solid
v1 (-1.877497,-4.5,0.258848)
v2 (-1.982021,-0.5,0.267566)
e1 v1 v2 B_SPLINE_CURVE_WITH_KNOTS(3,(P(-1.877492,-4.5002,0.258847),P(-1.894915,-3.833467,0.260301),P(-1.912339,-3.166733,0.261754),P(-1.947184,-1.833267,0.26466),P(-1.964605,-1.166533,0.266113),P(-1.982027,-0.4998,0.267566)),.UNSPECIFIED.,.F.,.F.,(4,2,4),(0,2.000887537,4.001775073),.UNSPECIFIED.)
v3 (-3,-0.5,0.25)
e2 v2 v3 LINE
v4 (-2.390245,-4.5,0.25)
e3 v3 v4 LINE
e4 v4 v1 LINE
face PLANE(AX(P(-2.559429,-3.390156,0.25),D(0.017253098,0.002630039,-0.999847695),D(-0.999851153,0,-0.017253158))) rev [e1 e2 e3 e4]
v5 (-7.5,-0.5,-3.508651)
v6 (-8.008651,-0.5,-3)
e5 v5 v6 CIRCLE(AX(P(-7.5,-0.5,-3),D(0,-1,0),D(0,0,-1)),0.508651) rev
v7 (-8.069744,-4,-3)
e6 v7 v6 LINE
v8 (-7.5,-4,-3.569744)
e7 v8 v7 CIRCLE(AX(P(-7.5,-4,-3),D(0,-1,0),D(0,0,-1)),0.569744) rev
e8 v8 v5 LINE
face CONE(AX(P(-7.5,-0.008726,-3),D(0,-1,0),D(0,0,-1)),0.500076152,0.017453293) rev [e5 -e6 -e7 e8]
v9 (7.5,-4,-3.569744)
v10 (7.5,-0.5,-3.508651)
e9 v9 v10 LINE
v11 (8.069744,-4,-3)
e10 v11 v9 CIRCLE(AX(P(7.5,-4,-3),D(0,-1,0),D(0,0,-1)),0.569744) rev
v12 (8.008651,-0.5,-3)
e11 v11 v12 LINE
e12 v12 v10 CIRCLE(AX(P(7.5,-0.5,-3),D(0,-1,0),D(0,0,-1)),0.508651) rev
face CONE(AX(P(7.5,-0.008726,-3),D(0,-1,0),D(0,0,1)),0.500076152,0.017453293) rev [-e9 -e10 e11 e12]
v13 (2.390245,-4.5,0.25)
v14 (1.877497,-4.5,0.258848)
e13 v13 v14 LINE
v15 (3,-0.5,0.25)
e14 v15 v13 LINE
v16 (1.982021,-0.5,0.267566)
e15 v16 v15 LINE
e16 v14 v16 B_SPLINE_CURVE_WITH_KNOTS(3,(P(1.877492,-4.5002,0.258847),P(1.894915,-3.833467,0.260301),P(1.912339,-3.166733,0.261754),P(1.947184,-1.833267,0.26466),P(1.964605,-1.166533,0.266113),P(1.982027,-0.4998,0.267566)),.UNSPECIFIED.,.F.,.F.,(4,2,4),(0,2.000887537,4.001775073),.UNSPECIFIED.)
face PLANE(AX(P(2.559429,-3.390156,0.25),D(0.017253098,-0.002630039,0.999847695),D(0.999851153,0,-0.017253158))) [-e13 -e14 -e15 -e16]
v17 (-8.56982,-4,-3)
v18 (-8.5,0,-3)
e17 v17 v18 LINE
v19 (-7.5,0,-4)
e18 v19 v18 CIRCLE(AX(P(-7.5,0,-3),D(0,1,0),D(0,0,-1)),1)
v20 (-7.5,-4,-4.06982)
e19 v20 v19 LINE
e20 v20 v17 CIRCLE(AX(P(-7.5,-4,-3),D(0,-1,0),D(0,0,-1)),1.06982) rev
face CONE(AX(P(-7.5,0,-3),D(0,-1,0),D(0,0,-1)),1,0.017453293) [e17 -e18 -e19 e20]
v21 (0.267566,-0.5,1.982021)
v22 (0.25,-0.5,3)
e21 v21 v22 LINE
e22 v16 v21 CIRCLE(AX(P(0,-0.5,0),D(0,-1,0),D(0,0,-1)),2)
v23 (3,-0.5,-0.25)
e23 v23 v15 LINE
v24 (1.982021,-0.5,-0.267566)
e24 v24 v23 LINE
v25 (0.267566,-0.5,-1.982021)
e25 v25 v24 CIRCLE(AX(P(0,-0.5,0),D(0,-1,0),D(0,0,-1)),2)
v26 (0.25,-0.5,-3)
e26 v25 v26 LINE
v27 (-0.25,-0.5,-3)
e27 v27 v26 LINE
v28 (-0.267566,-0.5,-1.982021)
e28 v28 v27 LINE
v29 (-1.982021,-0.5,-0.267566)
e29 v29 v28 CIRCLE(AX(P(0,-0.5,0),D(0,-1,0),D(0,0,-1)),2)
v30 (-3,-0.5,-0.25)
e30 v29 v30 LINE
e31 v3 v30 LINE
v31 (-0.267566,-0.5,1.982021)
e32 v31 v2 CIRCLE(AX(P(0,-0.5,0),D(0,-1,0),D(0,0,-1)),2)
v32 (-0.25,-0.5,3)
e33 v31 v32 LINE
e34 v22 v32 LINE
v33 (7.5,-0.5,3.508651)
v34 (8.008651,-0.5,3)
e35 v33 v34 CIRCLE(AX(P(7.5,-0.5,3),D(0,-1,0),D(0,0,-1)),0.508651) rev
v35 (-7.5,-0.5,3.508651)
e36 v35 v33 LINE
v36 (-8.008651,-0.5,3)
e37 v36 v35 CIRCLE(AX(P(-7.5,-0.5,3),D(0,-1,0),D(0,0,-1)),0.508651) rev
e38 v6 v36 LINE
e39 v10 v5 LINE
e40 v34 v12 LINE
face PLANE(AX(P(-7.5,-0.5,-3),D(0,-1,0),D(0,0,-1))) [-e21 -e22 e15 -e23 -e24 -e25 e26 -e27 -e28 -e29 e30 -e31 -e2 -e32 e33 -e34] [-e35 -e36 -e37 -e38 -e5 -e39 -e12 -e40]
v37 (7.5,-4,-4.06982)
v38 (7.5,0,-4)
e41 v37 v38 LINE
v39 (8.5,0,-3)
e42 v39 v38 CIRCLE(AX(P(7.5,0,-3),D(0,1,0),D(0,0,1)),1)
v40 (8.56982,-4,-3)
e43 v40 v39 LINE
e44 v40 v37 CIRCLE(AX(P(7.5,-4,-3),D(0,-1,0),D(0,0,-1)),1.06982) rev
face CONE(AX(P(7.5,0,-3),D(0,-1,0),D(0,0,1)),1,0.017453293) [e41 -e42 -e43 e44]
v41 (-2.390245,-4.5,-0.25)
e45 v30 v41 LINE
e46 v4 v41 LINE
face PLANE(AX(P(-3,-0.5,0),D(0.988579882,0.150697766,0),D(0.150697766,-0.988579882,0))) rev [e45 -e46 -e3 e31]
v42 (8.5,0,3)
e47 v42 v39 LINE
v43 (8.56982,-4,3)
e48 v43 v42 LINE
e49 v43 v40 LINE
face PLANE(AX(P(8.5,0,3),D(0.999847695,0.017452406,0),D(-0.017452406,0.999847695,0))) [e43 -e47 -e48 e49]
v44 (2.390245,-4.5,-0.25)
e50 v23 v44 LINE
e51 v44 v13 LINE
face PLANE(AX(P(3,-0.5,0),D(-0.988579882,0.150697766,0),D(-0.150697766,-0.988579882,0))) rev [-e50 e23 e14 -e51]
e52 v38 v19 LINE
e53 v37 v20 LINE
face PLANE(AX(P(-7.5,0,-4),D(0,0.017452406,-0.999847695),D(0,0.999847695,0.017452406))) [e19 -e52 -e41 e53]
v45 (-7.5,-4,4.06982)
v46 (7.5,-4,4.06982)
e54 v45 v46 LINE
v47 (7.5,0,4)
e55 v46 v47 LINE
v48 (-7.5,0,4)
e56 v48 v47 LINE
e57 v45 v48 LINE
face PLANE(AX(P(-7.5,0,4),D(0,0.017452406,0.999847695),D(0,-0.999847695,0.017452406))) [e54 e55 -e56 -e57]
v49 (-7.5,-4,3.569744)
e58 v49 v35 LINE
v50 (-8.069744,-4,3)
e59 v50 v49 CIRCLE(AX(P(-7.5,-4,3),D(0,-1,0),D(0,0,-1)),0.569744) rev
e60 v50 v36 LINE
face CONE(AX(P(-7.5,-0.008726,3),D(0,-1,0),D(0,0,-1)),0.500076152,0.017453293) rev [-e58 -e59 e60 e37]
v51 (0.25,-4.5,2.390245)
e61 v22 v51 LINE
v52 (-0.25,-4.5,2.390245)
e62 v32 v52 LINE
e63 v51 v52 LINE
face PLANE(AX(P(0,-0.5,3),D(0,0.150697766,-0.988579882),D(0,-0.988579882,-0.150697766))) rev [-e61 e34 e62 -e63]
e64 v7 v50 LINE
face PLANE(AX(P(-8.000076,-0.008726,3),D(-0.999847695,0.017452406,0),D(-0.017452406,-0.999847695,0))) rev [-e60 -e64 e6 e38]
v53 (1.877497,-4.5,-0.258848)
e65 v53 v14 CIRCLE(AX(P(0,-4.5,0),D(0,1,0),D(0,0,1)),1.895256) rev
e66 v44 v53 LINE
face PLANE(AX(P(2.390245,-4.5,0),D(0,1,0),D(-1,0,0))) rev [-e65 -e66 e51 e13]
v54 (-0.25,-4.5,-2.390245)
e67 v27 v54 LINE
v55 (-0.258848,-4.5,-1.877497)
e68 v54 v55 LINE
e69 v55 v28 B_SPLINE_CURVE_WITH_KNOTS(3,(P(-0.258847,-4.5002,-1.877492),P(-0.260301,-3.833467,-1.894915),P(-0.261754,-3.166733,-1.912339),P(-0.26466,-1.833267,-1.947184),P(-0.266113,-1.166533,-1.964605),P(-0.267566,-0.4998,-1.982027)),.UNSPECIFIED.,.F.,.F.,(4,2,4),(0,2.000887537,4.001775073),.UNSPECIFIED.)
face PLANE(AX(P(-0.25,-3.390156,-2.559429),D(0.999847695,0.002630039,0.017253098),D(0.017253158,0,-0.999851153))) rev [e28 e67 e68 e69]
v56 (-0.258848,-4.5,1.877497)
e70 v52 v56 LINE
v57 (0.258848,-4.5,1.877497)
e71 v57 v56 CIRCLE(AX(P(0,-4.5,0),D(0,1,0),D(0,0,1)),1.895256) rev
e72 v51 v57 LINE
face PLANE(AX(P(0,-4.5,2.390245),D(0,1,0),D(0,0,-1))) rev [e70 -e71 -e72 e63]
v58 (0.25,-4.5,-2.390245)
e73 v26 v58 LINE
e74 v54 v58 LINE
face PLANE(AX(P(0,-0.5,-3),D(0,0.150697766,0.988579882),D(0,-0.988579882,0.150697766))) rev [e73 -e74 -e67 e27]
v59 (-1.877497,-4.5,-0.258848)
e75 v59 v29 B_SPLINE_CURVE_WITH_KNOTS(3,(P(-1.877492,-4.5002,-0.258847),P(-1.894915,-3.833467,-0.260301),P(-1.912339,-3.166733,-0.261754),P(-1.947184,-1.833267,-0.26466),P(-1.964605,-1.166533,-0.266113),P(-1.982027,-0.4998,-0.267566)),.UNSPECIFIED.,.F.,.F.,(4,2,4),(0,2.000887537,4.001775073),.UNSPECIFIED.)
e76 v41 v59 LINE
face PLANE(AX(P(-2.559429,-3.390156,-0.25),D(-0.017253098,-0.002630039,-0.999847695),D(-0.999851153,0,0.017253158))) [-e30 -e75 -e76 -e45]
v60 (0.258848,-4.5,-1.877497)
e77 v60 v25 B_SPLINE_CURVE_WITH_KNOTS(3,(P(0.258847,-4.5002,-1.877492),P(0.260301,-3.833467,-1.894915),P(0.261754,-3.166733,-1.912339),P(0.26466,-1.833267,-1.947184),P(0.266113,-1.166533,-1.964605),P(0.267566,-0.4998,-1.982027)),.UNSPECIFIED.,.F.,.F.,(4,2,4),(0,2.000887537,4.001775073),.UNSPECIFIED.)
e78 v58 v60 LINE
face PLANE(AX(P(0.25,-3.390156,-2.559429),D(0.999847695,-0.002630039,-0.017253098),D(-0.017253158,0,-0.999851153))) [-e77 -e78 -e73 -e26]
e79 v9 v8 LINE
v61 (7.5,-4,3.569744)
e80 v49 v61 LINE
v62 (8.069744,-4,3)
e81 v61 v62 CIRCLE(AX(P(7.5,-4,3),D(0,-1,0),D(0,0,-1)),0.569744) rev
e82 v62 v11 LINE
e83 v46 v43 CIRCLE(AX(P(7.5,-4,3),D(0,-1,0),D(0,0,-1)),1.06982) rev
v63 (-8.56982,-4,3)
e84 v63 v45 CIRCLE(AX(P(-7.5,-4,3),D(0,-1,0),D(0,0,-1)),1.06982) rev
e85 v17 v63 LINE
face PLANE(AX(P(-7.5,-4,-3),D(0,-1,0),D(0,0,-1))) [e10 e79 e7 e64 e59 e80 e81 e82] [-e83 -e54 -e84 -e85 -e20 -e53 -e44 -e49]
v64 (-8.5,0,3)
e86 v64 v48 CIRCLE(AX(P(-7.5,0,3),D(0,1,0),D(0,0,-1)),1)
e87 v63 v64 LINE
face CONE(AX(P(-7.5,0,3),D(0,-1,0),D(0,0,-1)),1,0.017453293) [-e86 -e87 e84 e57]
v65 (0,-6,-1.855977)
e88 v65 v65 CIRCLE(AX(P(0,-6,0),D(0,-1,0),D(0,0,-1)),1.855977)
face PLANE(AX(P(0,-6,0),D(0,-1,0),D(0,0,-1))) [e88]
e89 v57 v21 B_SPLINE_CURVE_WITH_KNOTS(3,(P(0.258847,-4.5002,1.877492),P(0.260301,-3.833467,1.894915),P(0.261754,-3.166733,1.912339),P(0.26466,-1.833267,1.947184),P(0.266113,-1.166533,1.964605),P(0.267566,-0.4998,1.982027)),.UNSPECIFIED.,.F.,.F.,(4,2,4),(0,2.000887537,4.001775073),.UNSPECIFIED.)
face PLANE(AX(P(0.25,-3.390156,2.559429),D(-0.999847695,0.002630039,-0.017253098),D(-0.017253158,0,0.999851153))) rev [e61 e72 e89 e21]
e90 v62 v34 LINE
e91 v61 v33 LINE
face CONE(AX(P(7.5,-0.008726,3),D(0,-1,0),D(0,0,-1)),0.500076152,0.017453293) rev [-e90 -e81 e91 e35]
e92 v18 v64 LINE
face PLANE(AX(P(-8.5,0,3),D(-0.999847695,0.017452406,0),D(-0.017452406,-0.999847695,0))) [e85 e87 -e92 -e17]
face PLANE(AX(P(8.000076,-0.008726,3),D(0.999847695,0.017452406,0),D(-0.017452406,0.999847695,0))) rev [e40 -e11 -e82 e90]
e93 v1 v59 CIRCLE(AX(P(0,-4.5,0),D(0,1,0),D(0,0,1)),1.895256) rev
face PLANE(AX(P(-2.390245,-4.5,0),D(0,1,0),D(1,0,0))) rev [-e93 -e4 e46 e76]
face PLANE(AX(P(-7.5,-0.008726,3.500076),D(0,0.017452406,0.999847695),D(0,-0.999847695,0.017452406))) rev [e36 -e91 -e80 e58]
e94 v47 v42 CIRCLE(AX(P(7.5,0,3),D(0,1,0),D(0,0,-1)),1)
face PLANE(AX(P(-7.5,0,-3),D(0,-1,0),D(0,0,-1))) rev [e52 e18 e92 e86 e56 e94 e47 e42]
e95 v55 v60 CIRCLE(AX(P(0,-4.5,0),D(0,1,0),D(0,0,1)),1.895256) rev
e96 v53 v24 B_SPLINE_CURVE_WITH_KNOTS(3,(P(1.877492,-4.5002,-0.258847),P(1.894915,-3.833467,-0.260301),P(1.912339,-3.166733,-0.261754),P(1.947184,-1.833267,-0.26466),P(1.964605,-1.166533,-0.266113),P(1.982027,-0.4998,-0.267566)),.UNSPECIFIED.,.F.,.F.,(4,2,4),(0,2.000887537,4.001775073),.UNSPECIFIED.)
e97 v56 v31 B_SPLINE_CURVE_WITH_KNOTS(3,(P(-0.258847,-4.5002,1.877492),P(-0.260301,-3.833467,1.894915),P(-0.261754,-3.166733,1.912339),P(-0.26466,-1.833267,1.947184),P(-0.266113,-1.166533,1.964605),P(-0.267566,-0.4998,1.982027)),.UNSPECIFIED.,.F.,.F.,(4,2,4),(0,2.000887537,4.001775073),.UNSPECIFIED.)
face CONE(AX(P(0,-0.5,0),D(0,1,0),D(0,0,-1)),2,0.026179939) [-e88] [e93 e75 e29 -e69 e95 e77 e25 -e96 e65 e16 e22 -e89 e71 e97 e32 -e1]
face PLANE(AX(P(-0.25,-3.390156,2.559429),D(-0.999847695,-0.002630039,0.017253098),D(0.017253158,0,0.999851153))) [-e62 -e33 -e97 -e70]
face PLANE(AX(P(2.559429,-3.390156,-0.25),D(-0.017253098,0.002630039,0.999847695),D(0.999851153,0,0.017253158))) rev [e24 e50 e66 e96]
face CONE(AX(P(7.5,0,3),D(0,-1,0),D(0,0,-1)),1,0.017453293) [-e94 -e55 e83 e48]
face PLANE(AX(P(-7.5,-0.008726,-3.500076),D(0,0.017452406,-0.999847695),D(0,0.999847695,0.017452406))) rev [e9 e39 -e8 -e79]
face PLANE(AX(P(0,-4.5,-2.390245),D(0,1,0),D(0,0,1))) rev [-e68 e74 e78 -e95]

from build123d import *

# Parameters (mm, degrees)
BOSS_EXTRUDE1_DEPTH = 4
BOSS_EXTRUDE1_DRAFT = 1
SHELL1_T            = -0.5
SKETCH2_R           = 2
BOSS_EXTRUDE2_DEPTH = 5.5
BOSS_EXTRUDE2_TAPER = 1.5
CIRPATTERN1_COUNT   = 4


with BuildPart() as part:
    # Sketch1 → Boss-Extrude1 (with draft: the straight prism first)
    with BuildSketch(Plane(origin=(0, 0, 0), x_dir=(1, 0, 0), z_dir=(0, 1, 0))):
        with BuildLine():
            Line((-7.5, -4), (7.5, -4))
            ThreePointArc((7.5, -4), (8.207106781, -3.707106781), (8.5, -3))
            Line((8.5, -3), (8.5, 3))
            ThreePointArc((8.5, 3), (8.207106781, 3.707106781), (7.5, 4))
            Line((7.5, 4), (-7.5, 4))
            ThreePointArc((-7.5, 4), (-8.207106781, 3.707106781), (-8.5, 3))
            Line((-8.5, 3), (-8.5, -3))
            ThreePointArc((-8.5, -3), (-8.207106781, -3.707106781), (-7.5, -4))
        make_face()
    extrude(amount=-BOSS_EXTRUDE1_DEPTH)
    # Boss-Extrude1: the draft: its side faces are tilted about the plane it starts from
    boss_extrude1_sides = [part.faces().sort_by_distance(p)[0] for p in [
        (0, -2, 4),
        (8.207106781, -2, 3.707106781),
        (8.5, -2, 0),
        (8.207106781, -2, -3.707106781),
        (0, -2, -4),
        (-8.207106781, -2, -3.707106781),
        (-8.5, -2, 0),
        (-8.207106781, -2, 3.707106781),
    ]]
    draft(boss_extrude1_sides, Plane(origin=(0, 0, 0), x_dir=(1, 0, 0), z_dir=(0, 1, 0)), BOSS_EXTRUDE1_DRAFT)

    # Shell1
    shell1_openings = [part.faces().sort_by_distance(p)[0] for p in [
        (0, -4, 0),
    ]]
    offset(amount=SHELL1_T, openings=shell1_openings, kind=Kind.INTERSECTION)

    # Sketch2 → Boss-Extrude2 (add)
    with BuildSketch(Plane.XZ.offset(0.5)):
        Circle(SKETCH2_R)
    extrude(amount=BOSS_EXTRUDE2_DEPTH, taper=BOSS_EXTRUDE2_TAPER)

    # Rib1: read off the stored shape, not the designer's step
    # Rib1: loft between two sections, ruled curve by curve
    rib1_from = [
        Edge.make_line((1.982021306, -0.5, 0.267565961), (3, -0.5, 0.25)),
        Edge.make_line((1.982021306, -0.5, -0.267565961), (3, -0.5, -0.25)),
        Edge.make_line((3, -0.5, -0.25), (3, -0.5, 0.25)),
        Edge.make_line((1.982021306, -0.5, -0.267565961), (1.982021306, -0.5, 0.267565961)),
    ]
    rib1_to = [
        Edge.make_line((1.877496814, -4.5, 0.25884785), (2.390245469, -4.5, 0.25)),
        Edge.make_line((1.877496814, -4.5, -0.25884785), (2.390245469, -4.5, -0.25)),
        Edge.make_line((2.390245469, -4.5, -0.25), (2.390245469, -4.5, 0.25)),
        Edge.make_line((1.877496814, -4.5, -0.25884785), (1.877496814, -4.5, 0.25884785)),
    ]
    rib1 = Solid(Shell([*[Face.make_surface_from_curves(rib1_from[k], rib1_to[k]) for k in range(4)], Face(Wire(rib1_from)), Face(Wire(rib1_to))]))
    add(rib1)

    # CirPattern1: Rib1 ×4 about axis
    cirpattern1_axis = Axis((0, 0, 0), (0, 1, 0))
    for i in range(1, CIRPATTERN1_COUNT):
        add(rib1.rotate(cirpattern1_axis, i * 360 / CIRPATTERN1_COUNT))


solid = part.part
